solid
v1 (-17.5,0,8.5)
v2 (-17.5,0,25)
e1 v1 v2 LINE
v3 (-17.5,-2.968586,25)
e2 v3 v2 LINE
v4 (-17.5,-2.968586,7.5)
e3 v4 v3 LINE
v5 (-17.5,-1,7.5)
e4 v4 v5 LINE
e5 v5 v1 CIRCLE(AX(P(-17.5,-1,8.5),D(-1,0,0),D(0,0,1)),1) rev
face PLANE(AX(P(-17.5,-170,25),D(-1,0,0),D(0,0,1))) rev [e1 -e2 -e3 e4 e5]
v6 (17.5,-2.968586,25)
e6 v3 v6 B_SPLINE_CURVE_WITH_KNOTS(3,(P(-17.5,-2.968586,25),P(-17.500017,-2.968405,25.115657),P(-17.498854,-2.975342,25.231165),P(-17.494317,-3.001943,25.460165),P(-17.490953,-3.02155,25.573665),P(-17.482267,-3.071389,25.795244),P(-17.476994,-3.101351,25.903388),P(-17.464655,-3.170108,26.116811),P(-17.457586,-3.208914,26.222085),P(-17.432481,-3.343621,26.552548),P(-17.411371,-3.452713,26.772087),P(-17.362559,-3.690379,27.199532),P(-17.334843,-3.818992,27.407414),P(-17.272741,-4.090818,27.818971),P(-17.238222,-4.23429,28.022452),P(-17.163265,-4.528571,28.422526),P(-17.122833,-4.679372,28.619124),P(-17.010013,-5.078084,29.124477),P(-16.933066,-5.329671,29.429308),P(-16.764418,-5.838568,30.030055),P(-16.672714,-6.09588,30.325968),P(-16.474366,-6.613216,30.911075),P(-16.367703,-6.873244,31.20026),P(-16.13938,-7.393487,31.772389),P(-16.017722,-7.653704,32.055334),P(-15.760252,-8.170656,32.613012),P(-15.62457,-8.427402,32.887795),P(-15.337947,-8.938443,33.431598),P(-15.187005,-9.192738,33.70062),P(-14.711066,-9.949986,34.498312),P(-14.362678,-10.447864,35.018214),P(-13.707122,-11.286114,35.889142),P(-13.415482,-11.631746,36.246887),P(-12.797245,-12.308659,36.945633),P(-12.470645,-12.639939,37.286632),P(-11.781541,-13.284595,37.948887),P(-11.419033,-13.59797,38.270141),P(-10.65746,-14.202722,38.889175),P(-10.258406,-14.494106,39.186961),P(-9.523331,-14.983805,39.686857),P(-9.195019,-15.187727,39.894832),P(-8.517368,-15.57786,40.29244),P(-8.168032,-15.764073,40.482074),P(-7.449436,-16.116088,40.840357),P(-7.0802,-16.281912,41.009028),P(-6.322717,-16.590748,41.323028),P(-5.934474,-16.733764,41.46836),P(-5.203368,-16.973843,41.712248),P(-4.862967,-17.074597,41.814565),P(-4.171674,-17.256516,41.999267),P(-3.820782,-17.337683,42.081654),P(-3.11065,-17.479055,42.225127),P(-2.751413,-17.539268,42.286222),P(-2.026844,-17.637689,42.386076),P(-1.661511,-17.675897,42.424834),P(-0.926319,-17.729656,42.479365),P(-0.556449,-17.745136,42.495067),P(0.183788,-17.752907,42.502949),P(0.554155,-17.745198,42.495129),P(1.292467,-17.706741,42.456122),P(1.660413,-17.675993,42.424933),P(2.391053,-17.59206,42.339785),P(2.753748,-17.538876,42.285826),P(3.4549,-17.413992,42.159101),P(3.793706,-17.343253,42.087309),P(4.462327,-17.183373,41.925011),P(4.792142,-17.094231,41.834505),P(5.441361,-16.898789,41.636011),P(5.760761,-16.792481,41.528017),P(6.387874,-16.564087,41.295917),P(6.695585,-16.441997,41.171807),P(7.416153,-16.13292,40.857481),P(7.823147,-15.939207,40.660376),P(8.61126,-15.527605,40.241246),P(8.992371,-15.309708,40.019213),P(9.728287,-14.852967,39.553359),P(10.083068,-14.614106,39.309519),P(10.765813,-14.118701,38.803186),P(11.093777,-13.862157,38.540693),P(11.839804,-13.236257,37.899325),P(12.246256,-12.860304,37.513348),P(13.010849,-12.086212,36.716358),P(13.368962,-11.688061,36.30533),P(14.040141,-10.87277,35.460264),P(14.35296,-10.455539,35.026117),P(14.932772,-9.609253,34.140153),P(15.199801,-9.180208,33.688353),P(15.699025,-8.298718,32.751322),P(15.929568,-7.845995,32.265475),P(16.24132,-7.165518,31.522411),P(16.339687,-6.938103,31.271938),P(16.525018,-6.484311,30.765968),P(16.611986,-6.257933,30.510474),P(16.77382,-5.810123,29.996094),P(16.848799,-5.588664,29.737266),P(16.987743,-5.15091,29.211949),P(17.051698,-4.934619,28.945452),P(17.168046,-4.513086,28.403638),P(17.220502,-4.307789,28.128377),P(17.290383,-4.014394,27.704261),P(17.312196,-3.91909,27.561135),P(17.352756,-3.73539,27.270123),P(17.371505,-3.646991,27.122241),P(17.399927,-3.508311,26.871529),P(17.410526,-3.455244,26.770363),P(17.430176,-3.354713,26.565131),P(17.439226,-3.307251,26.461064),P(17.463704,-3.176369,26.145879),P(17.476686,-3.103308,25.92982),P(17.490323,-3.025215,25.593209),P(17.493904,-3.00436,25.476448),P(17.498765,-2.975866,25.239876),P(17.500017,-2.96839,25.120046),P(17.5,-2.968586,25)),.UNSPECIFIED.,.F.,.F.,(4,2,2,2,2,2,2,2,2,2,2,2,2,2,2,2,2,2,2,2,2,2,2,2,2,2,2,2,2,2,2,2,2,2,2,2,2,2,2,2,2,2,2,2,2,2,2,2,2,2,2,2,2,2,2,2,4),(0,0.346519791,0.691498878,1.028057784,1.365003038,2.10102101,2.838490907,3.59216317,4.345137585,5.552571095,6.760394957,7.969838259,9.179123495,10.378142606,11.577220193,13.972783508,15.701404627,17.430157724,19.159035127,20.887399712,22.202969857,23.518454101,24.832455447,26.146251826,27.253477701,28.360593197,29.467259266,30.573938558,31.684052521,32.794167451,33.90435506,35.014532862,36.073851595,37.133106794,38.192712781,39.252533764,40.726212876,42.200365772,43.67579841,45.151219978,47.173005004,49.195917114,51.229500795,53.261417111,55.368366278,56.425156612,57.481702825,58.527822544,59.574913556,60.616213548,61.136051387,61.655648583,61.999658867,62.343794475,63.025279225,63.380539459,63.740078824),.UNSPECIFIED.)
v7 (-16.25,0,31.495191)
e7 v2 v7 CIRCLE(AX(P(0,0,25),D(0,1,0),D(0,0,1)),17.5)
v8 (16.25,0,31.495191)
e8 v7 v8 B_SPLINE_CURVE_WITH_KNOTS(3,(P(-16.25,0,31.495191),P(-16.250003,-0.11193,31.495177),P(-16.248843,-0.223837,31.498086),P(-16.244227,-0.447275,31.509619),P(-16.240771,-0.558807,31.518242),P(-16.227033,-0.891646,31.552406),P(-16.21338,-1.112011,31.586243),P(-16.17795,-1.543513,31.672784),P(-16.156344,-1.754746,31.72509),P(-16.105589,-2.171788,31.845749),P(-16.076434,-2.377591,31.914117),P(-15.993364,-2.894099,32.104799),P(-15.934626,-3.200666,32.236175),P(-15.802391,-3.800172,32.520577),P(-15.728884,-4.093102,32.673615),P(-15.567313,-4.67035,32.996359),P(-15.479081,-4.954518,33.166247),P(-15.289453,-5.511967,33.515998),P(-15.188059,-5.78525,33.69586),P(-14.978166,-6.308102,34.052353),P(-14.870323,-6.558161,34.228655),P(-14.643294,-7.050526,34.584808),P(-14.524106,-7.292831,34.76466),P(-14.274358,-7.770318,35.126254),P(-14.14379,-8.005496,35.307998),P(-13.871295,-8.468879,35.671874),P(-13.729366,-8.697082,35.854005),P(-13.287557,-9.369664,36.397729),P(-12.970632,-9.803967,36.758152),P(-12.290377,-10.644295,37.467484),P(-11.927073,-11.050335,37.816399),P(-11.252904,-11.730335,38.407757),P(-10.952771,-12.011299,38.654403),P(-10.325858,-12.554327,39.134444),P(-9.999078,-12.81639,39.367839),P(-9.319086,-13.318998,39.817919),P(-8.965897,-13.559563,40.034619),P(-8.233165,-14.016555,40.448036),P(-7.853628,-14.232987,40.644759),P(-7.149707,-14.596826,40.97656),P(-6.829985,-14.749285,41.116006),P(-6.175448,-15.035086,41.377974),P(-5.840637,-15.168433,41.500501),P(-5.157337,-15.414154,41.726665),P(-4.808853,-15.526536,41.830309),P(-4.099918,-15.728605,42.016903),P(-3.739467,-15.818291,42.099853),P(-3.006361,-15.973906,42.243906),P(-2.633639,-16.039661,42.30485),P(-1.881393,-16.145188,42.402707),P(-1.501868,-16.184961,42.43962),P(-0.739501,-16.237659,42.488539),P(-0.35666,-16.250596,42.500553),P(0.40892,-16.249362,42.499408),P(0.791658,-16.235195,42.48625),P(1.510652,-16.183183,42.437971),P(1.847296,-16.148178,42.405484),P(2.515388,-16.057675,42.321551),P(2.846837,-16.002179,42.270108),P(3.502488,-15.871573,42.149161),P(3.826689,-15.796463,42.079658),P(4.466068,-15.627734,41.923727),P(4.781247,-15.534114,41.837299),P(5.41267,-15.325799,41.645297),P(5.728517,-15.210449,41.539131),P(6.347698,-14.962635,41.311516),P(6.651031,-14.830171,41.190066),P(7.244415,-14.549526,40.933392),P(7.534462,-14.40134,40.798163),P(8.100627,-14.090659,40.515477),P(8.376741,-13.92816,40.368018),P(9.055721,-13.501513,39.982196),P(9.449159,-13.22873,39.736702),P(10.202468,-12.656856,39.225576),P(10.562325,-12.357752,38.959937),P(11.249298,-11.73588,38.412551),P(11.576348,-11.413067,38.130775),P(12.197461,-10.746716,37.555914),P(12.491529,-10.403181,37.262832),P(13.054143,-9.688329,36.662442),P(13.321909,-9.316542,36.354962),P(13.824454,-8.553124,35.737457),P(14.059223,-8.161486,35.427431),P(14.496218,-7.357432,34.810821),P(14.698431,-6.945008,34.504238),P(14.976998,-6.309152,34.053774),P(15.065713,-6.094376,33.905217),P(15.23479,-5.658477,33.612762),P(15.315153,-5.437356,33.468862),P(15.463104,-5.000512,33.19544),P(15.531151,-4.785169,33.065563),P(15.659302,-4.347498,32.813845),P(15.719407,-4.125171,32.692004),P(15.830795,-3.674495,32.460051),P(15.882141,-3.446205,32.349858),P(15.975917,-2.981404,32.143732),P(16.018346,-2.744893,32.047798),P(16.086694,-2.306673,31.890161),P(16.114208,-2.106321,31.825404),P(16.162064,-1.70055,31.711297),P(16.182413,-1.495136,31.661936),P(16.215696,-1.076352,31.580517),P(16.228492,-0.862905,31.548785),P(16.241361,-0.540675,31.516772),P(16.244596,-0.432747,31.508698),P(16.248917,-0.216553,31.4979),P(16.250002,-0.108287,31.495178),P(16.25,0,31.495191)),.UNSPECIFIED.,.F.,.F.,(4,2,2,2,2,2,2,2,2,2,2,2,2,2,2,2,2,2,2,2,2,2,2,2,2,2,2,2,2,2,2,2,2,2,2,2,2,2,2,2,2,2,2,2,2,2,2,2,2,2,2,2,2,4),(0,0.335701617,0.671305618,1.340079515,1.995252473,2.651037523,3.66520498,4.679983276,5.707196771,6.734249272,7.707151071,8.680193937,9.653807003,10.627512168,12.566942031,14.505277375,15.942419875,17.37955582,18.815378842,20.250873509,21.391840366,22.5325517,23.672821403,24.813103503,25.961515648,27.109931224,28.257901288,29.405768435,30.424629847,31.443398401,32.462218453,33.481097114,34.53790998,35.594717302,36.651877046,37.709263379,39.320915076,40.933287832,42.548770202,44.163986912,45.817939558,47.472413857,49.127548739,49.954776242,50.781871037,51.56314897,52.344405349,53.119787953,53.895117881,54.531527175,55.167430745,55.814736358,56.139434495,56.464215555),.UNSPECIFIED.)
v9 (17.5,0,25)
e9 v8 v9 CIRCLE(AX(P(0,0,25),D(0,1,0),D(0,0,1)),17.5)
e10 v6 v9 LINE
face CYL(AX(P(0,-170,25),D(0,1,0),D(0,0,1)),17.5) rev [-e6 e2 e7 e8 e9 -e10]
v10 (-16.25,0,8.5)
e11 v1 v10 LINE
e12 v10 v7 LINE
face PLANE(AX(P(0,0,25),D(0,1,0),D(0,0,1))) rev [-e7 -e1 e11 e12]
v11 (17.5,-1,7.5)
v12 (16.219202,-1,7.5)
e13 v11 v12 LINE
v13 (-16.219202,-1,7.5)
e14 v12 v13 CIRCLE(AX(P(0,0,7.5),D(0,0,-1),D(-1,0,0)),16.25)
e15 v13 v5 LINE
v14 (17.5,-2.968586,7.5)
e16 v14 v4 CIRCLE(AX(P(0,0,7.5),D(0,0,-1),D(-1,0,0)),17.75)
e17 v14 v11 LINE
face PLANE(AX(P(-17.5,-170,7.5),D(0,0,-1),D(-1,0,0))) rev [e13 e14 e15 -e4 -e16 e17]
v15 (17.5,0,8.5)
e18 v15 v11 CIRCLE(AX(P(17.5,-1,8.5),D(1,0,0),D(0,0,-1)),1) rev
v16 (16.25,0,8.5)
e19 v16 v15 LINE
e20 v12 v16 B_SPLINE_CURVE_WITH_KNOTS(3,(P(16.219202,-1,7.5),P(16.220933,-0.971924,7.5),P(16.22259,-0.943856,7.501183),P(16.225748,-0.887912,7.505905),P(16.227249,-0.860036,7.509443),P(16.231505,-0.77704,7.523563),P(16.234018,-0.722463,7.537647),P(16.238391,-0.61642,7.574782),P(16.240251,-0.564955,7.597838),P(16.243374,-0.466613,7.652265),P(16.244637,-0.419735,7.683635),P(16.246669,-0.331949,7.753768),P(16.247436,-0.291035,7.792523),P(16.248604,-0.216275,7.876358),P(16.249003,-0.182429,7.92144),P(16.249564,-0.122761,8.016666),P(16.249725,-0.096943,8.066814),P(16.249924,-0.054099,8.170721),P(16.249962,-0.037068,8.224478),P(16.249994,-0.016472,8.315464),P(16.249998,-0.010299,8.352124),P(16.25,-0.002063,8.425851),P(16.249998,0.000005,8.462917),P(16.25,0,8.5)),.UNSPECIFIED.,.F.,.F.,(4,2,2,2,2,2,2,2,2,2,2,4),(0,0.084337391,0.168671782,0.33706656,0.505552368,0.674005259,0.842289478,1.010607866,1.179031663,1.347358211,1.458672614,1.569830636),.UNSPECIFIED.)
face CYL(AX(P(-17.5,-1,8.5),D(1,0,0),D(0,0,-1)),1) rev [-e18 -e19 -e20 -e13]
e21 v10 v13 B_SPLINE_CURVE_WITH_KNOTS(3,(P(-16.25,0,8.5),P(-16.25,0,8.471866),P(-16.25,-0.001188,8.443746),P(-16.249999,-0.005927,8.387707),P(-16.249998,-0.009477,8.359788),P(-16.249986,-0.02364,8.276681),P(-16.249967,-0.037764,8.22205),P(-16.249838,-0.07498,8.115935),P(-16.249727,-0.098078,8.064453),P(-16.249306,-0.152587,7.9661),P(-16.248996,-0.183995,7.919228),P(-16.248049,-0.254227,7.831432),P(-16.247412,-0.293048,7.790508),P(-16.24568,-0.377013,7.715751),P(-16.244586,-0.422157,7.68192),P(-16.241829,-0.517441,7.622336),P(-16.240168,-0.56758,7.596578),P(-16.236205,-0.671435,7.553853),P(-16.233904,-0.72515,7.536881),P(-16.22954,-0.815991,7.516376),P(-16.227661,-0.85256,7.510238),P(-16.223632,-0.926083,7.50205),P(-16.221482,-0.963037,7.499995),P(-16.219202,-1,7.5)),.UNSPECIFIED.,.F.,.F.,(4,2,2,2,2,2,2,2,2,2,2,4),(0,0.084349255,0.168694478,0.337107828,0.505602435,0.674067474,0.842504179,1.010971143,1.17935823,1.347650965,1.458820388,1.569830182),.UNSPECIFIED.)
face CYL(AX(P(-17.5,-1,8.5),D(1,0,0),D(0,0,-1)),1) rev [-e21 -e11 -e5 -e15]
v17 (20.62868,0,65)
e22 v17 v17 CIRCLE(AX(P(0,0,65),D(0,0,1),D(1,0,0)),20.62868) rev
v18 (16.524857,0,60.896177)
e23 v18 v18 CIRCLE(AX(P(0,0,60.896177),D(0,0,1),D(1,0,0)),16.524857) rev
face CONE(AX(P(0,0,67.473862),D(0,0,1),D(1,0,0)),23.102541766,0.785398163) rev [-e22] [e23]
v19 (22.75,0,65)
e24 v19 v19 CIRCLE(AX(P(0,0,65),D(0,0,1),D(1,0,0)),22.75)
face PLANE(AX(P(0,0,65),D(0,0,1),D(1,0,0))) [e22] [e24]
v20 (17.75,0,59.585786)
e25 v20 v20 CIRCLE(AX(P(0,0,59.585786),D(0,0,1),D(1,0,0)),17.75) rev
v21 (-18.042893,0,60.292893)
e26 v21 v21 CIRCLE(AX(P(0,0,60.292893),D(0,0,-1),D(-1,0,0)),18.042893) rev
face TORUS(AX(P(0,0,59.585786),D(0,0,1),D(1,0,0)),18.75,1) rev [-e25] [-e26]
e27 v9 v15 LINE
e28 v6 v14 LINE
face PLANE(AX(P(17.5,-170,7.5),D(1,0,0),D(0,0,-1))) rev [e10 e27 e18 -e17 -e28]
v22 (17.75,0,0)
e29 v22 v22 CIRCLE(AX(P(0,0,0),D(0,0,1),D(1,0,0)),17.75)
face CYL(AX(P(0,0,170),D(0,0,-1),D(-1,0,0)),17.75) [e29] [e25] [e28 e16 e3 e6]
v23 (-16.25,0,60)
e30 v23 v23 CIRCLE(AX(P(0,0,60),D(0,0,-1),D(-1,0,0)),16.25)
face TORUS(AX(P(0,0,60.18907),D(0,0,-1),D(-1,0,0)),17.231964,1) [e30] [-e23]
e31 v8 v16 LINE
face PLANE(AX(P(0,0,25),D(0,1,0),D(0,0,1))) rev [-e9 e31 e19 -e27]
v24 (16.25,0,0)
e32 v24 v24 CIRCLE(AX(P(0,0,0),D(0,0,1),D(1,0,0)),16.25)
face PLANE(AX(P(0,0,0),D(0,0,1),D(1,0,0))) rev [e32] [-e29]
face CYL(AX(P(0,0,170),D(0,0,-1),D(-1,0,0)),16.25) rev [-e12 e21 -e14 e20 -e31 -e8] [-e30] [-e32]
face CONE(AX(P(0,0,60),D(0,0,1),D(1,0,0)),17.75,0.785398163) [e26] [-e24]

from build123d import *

# Parameters (mm, degrees)
SCHIZZO1_R                   = 17.75
SCHIZZO1_R_2                 = 16.25
ESTRUSIONE_ESTRUSIONE1_DEPTH = 170
TAGLIO_ESTRUSIONE1_DEPTH     = 170
TAGLIO_ESTRUSIONE2_START     = -60
SCHIZZO4_R                   = 41.734641341
TAGLIO_ESTRUSIONE2_DEPTH     = 112.843315381
SCHIZZO5_R                   = 17.75
SCHIZZO6_R                   = 22.75
RACCORDO1_R                  = 1


with BuildPart() as part:
    # Schizzo1 → Estrusione-Estrusione1 (new body)
    with BuildSketch(Plane.XY):
        Circle(SCHIZZO1_R)
        Circle(SCHIZZO1_R_2, mode=Mode.SUBTRACT)
    extrude(amount=ESTRUSIONE_ESTRUSIONE1_DEPTH)

    # Schizzo2 → Taglio-Estrusione1 (cut)
    with BuildSketch(Plane(origin=(0, 0, 0), x_dir=(1, 0, 0), z_dir=(0, 1, 0))):
        with BuildLine():
            Line((-17.5, -25), (-17.5, -7.5))
            Line((-17.5, -7.5), (17.5, -7.5))
            Line((17.5, -7.5), (17.5, -25))
            ThreePointArc((17.5, -25), (0, -42.5), (-17.5, -25))
        make_face()
    extrude(amount=-TAGLIO_ESTRUSIONE1_DEPTH, mode=Mode.SUBTRACT)

    # Schizzo4 → Taglio-Estrusione2 (cut, through all)
    with BuildSketch(Plane(origin=(0, 0, 0), x_dir=(-1, 0, 0), z_dir=(0, 0, -1)).offset(TAGLIO_ESTRUSIONE2_START)):
        Circle(SCHIZZO4_R)
    extrude(amount=-TAGLIO_ESTRUSIONE2_DEPTH, mode=Mode.SUBTRACT)

    # Schizzo5 → Loft2 section 0
    with BuildSketch(Plane.XY.offset(60)):
        Circle(SCHIZZO5_R)
    # Schizzo6 → Loft2 section 1
    with BuildSketch(Plane.XY.offset(65)):
        Circle(SCHIZZO6_R)
    loft()

    # Schizzo9 → Taglia-Rivoluzione1 (revolve, cut)
    with BuildSketch(Plane(origin=(0, 0, 0), x_dir=(1, 0, 0), z_dir=(0, 1, 0)), mode=Mode.PRIVATE) as taglia_rivoluzione1_sk:
        Polygon((0, -53.809990156), (0, -67.47386211), (23.102541766, -67.47386211), (9.438669813, -53.809990156), align=None)
    revolve(taglia_rivoluzione1_sk.sketch.rotate(Axis((0, 0, 53.809990156), (0, 0, 1)), 180), axis=Axis((0, 0, 53.809990156), (0, 0, 1)), mode=Mode.SUBTRACT)

    # Raccordo1
    # the kernel refuses this fillet: 1 mm, written as the material it adds along each edge
    with BuildSketch(Plane(origin=(13.75, 0, 7.5), x_dir=(0, -1, 0), z_dir=(1, 0, 0))) as raccordo1_piece_1_section:
        with BuildLine():
            CenterArc((RACCORDO1_R, -RACCORDO1_R), RACCORDO1_R, 90, 90)
            Line((0, -RACCORDO1_R), (0, 0))
            Line((0, 0), (RACCORDO1_R, 0))
        make_face()
    raccordo1_piece_1 = extrude(amount=3.75, mode=Mode.PRIVATE)
    raccordo1_piece_1 = raccordo1_piece_1 - Plane(origin=(0, 0, 7.5), x_dir=(1, 0, 0), z_dir=(0, 0, -1)) * Cylinder(16.25, 12, mode=Mode.PRIVATE)
    add(raccordo1_piece_1)
    with BuildSketch(Plane(origin=(-17.5, 0, 7.5), x_dir=(0, -1, 0), z_dir=(1, 0, 0))) as raccordo1_piece_2_section:
        with BuildLine():
            CenterArc((RACCORDO1_R, -RACCORDO1_R), RACCORDO1_R, 90, 90)
            Line((0, -RACCORDO1_R), (0, 0))
            Line((0, 0), (RACCORDO1_R, 0))
        make_face()
    raccordo1_piece_2 = extrude(amount=3.75, mode=Mode.PRIVATE)
    raccordo1_piece_2 = raccordo1_piece_2 - Plane(origin=(0, 0, 7.5), x_dir=(1, 0, 0), z_dir=(0, 0, -1)) * Cylinder(16.25, 12, mode=Mode.PRIVATE)
    add(raccordo1_piece_2)
    with BuildSketch(Plane(origin=(0, 0, 60), x_dir=(1, 0, 0), z_dir=(0, 1, 0))) as raccordo1_piece_3:
        with BuildLine():
            CenterArc((17.75 + RACCORDO1_R, RACCORDO1_R * 0.414213562373), RACCORDO1_R, 180, 45)
            Line((17.75 + RACCORDO1_R * 0.292893218813, -RACCORDO1_R * 0.292893218813), (17.75, 0))
            Line((17.75, 0), (17.75, RACCORDO1_R * 0.414213562373))
        make_face()
    revolve(axis=Axis((0, 0, 60), (0, 0, -1)))
    # the kernel refuses this fillet: 1 mm, written as the material it takes off along each edge
    with BuildSketch(Plane(origin=(0, 0, 60), x_dir=(-1, 0, 0), z_dir=(0, -1, 0))) as raccordo1_2_piece_1:
        with BuildLine():
            CenterArc((17.231963548, -0.18907033), RACCORDO1_R, 169.101465323, 55.898534677)
            Line((16.524856767, -0.896177111), (15.628679656, 0))
            Line((15.628679656, 0), (16.25, 0))
        make_face()
    revolve(axis=Axis((0, 0, 60), (0, 0, -1)), mode=Mode.SUBTRACT)


solid = part.part
